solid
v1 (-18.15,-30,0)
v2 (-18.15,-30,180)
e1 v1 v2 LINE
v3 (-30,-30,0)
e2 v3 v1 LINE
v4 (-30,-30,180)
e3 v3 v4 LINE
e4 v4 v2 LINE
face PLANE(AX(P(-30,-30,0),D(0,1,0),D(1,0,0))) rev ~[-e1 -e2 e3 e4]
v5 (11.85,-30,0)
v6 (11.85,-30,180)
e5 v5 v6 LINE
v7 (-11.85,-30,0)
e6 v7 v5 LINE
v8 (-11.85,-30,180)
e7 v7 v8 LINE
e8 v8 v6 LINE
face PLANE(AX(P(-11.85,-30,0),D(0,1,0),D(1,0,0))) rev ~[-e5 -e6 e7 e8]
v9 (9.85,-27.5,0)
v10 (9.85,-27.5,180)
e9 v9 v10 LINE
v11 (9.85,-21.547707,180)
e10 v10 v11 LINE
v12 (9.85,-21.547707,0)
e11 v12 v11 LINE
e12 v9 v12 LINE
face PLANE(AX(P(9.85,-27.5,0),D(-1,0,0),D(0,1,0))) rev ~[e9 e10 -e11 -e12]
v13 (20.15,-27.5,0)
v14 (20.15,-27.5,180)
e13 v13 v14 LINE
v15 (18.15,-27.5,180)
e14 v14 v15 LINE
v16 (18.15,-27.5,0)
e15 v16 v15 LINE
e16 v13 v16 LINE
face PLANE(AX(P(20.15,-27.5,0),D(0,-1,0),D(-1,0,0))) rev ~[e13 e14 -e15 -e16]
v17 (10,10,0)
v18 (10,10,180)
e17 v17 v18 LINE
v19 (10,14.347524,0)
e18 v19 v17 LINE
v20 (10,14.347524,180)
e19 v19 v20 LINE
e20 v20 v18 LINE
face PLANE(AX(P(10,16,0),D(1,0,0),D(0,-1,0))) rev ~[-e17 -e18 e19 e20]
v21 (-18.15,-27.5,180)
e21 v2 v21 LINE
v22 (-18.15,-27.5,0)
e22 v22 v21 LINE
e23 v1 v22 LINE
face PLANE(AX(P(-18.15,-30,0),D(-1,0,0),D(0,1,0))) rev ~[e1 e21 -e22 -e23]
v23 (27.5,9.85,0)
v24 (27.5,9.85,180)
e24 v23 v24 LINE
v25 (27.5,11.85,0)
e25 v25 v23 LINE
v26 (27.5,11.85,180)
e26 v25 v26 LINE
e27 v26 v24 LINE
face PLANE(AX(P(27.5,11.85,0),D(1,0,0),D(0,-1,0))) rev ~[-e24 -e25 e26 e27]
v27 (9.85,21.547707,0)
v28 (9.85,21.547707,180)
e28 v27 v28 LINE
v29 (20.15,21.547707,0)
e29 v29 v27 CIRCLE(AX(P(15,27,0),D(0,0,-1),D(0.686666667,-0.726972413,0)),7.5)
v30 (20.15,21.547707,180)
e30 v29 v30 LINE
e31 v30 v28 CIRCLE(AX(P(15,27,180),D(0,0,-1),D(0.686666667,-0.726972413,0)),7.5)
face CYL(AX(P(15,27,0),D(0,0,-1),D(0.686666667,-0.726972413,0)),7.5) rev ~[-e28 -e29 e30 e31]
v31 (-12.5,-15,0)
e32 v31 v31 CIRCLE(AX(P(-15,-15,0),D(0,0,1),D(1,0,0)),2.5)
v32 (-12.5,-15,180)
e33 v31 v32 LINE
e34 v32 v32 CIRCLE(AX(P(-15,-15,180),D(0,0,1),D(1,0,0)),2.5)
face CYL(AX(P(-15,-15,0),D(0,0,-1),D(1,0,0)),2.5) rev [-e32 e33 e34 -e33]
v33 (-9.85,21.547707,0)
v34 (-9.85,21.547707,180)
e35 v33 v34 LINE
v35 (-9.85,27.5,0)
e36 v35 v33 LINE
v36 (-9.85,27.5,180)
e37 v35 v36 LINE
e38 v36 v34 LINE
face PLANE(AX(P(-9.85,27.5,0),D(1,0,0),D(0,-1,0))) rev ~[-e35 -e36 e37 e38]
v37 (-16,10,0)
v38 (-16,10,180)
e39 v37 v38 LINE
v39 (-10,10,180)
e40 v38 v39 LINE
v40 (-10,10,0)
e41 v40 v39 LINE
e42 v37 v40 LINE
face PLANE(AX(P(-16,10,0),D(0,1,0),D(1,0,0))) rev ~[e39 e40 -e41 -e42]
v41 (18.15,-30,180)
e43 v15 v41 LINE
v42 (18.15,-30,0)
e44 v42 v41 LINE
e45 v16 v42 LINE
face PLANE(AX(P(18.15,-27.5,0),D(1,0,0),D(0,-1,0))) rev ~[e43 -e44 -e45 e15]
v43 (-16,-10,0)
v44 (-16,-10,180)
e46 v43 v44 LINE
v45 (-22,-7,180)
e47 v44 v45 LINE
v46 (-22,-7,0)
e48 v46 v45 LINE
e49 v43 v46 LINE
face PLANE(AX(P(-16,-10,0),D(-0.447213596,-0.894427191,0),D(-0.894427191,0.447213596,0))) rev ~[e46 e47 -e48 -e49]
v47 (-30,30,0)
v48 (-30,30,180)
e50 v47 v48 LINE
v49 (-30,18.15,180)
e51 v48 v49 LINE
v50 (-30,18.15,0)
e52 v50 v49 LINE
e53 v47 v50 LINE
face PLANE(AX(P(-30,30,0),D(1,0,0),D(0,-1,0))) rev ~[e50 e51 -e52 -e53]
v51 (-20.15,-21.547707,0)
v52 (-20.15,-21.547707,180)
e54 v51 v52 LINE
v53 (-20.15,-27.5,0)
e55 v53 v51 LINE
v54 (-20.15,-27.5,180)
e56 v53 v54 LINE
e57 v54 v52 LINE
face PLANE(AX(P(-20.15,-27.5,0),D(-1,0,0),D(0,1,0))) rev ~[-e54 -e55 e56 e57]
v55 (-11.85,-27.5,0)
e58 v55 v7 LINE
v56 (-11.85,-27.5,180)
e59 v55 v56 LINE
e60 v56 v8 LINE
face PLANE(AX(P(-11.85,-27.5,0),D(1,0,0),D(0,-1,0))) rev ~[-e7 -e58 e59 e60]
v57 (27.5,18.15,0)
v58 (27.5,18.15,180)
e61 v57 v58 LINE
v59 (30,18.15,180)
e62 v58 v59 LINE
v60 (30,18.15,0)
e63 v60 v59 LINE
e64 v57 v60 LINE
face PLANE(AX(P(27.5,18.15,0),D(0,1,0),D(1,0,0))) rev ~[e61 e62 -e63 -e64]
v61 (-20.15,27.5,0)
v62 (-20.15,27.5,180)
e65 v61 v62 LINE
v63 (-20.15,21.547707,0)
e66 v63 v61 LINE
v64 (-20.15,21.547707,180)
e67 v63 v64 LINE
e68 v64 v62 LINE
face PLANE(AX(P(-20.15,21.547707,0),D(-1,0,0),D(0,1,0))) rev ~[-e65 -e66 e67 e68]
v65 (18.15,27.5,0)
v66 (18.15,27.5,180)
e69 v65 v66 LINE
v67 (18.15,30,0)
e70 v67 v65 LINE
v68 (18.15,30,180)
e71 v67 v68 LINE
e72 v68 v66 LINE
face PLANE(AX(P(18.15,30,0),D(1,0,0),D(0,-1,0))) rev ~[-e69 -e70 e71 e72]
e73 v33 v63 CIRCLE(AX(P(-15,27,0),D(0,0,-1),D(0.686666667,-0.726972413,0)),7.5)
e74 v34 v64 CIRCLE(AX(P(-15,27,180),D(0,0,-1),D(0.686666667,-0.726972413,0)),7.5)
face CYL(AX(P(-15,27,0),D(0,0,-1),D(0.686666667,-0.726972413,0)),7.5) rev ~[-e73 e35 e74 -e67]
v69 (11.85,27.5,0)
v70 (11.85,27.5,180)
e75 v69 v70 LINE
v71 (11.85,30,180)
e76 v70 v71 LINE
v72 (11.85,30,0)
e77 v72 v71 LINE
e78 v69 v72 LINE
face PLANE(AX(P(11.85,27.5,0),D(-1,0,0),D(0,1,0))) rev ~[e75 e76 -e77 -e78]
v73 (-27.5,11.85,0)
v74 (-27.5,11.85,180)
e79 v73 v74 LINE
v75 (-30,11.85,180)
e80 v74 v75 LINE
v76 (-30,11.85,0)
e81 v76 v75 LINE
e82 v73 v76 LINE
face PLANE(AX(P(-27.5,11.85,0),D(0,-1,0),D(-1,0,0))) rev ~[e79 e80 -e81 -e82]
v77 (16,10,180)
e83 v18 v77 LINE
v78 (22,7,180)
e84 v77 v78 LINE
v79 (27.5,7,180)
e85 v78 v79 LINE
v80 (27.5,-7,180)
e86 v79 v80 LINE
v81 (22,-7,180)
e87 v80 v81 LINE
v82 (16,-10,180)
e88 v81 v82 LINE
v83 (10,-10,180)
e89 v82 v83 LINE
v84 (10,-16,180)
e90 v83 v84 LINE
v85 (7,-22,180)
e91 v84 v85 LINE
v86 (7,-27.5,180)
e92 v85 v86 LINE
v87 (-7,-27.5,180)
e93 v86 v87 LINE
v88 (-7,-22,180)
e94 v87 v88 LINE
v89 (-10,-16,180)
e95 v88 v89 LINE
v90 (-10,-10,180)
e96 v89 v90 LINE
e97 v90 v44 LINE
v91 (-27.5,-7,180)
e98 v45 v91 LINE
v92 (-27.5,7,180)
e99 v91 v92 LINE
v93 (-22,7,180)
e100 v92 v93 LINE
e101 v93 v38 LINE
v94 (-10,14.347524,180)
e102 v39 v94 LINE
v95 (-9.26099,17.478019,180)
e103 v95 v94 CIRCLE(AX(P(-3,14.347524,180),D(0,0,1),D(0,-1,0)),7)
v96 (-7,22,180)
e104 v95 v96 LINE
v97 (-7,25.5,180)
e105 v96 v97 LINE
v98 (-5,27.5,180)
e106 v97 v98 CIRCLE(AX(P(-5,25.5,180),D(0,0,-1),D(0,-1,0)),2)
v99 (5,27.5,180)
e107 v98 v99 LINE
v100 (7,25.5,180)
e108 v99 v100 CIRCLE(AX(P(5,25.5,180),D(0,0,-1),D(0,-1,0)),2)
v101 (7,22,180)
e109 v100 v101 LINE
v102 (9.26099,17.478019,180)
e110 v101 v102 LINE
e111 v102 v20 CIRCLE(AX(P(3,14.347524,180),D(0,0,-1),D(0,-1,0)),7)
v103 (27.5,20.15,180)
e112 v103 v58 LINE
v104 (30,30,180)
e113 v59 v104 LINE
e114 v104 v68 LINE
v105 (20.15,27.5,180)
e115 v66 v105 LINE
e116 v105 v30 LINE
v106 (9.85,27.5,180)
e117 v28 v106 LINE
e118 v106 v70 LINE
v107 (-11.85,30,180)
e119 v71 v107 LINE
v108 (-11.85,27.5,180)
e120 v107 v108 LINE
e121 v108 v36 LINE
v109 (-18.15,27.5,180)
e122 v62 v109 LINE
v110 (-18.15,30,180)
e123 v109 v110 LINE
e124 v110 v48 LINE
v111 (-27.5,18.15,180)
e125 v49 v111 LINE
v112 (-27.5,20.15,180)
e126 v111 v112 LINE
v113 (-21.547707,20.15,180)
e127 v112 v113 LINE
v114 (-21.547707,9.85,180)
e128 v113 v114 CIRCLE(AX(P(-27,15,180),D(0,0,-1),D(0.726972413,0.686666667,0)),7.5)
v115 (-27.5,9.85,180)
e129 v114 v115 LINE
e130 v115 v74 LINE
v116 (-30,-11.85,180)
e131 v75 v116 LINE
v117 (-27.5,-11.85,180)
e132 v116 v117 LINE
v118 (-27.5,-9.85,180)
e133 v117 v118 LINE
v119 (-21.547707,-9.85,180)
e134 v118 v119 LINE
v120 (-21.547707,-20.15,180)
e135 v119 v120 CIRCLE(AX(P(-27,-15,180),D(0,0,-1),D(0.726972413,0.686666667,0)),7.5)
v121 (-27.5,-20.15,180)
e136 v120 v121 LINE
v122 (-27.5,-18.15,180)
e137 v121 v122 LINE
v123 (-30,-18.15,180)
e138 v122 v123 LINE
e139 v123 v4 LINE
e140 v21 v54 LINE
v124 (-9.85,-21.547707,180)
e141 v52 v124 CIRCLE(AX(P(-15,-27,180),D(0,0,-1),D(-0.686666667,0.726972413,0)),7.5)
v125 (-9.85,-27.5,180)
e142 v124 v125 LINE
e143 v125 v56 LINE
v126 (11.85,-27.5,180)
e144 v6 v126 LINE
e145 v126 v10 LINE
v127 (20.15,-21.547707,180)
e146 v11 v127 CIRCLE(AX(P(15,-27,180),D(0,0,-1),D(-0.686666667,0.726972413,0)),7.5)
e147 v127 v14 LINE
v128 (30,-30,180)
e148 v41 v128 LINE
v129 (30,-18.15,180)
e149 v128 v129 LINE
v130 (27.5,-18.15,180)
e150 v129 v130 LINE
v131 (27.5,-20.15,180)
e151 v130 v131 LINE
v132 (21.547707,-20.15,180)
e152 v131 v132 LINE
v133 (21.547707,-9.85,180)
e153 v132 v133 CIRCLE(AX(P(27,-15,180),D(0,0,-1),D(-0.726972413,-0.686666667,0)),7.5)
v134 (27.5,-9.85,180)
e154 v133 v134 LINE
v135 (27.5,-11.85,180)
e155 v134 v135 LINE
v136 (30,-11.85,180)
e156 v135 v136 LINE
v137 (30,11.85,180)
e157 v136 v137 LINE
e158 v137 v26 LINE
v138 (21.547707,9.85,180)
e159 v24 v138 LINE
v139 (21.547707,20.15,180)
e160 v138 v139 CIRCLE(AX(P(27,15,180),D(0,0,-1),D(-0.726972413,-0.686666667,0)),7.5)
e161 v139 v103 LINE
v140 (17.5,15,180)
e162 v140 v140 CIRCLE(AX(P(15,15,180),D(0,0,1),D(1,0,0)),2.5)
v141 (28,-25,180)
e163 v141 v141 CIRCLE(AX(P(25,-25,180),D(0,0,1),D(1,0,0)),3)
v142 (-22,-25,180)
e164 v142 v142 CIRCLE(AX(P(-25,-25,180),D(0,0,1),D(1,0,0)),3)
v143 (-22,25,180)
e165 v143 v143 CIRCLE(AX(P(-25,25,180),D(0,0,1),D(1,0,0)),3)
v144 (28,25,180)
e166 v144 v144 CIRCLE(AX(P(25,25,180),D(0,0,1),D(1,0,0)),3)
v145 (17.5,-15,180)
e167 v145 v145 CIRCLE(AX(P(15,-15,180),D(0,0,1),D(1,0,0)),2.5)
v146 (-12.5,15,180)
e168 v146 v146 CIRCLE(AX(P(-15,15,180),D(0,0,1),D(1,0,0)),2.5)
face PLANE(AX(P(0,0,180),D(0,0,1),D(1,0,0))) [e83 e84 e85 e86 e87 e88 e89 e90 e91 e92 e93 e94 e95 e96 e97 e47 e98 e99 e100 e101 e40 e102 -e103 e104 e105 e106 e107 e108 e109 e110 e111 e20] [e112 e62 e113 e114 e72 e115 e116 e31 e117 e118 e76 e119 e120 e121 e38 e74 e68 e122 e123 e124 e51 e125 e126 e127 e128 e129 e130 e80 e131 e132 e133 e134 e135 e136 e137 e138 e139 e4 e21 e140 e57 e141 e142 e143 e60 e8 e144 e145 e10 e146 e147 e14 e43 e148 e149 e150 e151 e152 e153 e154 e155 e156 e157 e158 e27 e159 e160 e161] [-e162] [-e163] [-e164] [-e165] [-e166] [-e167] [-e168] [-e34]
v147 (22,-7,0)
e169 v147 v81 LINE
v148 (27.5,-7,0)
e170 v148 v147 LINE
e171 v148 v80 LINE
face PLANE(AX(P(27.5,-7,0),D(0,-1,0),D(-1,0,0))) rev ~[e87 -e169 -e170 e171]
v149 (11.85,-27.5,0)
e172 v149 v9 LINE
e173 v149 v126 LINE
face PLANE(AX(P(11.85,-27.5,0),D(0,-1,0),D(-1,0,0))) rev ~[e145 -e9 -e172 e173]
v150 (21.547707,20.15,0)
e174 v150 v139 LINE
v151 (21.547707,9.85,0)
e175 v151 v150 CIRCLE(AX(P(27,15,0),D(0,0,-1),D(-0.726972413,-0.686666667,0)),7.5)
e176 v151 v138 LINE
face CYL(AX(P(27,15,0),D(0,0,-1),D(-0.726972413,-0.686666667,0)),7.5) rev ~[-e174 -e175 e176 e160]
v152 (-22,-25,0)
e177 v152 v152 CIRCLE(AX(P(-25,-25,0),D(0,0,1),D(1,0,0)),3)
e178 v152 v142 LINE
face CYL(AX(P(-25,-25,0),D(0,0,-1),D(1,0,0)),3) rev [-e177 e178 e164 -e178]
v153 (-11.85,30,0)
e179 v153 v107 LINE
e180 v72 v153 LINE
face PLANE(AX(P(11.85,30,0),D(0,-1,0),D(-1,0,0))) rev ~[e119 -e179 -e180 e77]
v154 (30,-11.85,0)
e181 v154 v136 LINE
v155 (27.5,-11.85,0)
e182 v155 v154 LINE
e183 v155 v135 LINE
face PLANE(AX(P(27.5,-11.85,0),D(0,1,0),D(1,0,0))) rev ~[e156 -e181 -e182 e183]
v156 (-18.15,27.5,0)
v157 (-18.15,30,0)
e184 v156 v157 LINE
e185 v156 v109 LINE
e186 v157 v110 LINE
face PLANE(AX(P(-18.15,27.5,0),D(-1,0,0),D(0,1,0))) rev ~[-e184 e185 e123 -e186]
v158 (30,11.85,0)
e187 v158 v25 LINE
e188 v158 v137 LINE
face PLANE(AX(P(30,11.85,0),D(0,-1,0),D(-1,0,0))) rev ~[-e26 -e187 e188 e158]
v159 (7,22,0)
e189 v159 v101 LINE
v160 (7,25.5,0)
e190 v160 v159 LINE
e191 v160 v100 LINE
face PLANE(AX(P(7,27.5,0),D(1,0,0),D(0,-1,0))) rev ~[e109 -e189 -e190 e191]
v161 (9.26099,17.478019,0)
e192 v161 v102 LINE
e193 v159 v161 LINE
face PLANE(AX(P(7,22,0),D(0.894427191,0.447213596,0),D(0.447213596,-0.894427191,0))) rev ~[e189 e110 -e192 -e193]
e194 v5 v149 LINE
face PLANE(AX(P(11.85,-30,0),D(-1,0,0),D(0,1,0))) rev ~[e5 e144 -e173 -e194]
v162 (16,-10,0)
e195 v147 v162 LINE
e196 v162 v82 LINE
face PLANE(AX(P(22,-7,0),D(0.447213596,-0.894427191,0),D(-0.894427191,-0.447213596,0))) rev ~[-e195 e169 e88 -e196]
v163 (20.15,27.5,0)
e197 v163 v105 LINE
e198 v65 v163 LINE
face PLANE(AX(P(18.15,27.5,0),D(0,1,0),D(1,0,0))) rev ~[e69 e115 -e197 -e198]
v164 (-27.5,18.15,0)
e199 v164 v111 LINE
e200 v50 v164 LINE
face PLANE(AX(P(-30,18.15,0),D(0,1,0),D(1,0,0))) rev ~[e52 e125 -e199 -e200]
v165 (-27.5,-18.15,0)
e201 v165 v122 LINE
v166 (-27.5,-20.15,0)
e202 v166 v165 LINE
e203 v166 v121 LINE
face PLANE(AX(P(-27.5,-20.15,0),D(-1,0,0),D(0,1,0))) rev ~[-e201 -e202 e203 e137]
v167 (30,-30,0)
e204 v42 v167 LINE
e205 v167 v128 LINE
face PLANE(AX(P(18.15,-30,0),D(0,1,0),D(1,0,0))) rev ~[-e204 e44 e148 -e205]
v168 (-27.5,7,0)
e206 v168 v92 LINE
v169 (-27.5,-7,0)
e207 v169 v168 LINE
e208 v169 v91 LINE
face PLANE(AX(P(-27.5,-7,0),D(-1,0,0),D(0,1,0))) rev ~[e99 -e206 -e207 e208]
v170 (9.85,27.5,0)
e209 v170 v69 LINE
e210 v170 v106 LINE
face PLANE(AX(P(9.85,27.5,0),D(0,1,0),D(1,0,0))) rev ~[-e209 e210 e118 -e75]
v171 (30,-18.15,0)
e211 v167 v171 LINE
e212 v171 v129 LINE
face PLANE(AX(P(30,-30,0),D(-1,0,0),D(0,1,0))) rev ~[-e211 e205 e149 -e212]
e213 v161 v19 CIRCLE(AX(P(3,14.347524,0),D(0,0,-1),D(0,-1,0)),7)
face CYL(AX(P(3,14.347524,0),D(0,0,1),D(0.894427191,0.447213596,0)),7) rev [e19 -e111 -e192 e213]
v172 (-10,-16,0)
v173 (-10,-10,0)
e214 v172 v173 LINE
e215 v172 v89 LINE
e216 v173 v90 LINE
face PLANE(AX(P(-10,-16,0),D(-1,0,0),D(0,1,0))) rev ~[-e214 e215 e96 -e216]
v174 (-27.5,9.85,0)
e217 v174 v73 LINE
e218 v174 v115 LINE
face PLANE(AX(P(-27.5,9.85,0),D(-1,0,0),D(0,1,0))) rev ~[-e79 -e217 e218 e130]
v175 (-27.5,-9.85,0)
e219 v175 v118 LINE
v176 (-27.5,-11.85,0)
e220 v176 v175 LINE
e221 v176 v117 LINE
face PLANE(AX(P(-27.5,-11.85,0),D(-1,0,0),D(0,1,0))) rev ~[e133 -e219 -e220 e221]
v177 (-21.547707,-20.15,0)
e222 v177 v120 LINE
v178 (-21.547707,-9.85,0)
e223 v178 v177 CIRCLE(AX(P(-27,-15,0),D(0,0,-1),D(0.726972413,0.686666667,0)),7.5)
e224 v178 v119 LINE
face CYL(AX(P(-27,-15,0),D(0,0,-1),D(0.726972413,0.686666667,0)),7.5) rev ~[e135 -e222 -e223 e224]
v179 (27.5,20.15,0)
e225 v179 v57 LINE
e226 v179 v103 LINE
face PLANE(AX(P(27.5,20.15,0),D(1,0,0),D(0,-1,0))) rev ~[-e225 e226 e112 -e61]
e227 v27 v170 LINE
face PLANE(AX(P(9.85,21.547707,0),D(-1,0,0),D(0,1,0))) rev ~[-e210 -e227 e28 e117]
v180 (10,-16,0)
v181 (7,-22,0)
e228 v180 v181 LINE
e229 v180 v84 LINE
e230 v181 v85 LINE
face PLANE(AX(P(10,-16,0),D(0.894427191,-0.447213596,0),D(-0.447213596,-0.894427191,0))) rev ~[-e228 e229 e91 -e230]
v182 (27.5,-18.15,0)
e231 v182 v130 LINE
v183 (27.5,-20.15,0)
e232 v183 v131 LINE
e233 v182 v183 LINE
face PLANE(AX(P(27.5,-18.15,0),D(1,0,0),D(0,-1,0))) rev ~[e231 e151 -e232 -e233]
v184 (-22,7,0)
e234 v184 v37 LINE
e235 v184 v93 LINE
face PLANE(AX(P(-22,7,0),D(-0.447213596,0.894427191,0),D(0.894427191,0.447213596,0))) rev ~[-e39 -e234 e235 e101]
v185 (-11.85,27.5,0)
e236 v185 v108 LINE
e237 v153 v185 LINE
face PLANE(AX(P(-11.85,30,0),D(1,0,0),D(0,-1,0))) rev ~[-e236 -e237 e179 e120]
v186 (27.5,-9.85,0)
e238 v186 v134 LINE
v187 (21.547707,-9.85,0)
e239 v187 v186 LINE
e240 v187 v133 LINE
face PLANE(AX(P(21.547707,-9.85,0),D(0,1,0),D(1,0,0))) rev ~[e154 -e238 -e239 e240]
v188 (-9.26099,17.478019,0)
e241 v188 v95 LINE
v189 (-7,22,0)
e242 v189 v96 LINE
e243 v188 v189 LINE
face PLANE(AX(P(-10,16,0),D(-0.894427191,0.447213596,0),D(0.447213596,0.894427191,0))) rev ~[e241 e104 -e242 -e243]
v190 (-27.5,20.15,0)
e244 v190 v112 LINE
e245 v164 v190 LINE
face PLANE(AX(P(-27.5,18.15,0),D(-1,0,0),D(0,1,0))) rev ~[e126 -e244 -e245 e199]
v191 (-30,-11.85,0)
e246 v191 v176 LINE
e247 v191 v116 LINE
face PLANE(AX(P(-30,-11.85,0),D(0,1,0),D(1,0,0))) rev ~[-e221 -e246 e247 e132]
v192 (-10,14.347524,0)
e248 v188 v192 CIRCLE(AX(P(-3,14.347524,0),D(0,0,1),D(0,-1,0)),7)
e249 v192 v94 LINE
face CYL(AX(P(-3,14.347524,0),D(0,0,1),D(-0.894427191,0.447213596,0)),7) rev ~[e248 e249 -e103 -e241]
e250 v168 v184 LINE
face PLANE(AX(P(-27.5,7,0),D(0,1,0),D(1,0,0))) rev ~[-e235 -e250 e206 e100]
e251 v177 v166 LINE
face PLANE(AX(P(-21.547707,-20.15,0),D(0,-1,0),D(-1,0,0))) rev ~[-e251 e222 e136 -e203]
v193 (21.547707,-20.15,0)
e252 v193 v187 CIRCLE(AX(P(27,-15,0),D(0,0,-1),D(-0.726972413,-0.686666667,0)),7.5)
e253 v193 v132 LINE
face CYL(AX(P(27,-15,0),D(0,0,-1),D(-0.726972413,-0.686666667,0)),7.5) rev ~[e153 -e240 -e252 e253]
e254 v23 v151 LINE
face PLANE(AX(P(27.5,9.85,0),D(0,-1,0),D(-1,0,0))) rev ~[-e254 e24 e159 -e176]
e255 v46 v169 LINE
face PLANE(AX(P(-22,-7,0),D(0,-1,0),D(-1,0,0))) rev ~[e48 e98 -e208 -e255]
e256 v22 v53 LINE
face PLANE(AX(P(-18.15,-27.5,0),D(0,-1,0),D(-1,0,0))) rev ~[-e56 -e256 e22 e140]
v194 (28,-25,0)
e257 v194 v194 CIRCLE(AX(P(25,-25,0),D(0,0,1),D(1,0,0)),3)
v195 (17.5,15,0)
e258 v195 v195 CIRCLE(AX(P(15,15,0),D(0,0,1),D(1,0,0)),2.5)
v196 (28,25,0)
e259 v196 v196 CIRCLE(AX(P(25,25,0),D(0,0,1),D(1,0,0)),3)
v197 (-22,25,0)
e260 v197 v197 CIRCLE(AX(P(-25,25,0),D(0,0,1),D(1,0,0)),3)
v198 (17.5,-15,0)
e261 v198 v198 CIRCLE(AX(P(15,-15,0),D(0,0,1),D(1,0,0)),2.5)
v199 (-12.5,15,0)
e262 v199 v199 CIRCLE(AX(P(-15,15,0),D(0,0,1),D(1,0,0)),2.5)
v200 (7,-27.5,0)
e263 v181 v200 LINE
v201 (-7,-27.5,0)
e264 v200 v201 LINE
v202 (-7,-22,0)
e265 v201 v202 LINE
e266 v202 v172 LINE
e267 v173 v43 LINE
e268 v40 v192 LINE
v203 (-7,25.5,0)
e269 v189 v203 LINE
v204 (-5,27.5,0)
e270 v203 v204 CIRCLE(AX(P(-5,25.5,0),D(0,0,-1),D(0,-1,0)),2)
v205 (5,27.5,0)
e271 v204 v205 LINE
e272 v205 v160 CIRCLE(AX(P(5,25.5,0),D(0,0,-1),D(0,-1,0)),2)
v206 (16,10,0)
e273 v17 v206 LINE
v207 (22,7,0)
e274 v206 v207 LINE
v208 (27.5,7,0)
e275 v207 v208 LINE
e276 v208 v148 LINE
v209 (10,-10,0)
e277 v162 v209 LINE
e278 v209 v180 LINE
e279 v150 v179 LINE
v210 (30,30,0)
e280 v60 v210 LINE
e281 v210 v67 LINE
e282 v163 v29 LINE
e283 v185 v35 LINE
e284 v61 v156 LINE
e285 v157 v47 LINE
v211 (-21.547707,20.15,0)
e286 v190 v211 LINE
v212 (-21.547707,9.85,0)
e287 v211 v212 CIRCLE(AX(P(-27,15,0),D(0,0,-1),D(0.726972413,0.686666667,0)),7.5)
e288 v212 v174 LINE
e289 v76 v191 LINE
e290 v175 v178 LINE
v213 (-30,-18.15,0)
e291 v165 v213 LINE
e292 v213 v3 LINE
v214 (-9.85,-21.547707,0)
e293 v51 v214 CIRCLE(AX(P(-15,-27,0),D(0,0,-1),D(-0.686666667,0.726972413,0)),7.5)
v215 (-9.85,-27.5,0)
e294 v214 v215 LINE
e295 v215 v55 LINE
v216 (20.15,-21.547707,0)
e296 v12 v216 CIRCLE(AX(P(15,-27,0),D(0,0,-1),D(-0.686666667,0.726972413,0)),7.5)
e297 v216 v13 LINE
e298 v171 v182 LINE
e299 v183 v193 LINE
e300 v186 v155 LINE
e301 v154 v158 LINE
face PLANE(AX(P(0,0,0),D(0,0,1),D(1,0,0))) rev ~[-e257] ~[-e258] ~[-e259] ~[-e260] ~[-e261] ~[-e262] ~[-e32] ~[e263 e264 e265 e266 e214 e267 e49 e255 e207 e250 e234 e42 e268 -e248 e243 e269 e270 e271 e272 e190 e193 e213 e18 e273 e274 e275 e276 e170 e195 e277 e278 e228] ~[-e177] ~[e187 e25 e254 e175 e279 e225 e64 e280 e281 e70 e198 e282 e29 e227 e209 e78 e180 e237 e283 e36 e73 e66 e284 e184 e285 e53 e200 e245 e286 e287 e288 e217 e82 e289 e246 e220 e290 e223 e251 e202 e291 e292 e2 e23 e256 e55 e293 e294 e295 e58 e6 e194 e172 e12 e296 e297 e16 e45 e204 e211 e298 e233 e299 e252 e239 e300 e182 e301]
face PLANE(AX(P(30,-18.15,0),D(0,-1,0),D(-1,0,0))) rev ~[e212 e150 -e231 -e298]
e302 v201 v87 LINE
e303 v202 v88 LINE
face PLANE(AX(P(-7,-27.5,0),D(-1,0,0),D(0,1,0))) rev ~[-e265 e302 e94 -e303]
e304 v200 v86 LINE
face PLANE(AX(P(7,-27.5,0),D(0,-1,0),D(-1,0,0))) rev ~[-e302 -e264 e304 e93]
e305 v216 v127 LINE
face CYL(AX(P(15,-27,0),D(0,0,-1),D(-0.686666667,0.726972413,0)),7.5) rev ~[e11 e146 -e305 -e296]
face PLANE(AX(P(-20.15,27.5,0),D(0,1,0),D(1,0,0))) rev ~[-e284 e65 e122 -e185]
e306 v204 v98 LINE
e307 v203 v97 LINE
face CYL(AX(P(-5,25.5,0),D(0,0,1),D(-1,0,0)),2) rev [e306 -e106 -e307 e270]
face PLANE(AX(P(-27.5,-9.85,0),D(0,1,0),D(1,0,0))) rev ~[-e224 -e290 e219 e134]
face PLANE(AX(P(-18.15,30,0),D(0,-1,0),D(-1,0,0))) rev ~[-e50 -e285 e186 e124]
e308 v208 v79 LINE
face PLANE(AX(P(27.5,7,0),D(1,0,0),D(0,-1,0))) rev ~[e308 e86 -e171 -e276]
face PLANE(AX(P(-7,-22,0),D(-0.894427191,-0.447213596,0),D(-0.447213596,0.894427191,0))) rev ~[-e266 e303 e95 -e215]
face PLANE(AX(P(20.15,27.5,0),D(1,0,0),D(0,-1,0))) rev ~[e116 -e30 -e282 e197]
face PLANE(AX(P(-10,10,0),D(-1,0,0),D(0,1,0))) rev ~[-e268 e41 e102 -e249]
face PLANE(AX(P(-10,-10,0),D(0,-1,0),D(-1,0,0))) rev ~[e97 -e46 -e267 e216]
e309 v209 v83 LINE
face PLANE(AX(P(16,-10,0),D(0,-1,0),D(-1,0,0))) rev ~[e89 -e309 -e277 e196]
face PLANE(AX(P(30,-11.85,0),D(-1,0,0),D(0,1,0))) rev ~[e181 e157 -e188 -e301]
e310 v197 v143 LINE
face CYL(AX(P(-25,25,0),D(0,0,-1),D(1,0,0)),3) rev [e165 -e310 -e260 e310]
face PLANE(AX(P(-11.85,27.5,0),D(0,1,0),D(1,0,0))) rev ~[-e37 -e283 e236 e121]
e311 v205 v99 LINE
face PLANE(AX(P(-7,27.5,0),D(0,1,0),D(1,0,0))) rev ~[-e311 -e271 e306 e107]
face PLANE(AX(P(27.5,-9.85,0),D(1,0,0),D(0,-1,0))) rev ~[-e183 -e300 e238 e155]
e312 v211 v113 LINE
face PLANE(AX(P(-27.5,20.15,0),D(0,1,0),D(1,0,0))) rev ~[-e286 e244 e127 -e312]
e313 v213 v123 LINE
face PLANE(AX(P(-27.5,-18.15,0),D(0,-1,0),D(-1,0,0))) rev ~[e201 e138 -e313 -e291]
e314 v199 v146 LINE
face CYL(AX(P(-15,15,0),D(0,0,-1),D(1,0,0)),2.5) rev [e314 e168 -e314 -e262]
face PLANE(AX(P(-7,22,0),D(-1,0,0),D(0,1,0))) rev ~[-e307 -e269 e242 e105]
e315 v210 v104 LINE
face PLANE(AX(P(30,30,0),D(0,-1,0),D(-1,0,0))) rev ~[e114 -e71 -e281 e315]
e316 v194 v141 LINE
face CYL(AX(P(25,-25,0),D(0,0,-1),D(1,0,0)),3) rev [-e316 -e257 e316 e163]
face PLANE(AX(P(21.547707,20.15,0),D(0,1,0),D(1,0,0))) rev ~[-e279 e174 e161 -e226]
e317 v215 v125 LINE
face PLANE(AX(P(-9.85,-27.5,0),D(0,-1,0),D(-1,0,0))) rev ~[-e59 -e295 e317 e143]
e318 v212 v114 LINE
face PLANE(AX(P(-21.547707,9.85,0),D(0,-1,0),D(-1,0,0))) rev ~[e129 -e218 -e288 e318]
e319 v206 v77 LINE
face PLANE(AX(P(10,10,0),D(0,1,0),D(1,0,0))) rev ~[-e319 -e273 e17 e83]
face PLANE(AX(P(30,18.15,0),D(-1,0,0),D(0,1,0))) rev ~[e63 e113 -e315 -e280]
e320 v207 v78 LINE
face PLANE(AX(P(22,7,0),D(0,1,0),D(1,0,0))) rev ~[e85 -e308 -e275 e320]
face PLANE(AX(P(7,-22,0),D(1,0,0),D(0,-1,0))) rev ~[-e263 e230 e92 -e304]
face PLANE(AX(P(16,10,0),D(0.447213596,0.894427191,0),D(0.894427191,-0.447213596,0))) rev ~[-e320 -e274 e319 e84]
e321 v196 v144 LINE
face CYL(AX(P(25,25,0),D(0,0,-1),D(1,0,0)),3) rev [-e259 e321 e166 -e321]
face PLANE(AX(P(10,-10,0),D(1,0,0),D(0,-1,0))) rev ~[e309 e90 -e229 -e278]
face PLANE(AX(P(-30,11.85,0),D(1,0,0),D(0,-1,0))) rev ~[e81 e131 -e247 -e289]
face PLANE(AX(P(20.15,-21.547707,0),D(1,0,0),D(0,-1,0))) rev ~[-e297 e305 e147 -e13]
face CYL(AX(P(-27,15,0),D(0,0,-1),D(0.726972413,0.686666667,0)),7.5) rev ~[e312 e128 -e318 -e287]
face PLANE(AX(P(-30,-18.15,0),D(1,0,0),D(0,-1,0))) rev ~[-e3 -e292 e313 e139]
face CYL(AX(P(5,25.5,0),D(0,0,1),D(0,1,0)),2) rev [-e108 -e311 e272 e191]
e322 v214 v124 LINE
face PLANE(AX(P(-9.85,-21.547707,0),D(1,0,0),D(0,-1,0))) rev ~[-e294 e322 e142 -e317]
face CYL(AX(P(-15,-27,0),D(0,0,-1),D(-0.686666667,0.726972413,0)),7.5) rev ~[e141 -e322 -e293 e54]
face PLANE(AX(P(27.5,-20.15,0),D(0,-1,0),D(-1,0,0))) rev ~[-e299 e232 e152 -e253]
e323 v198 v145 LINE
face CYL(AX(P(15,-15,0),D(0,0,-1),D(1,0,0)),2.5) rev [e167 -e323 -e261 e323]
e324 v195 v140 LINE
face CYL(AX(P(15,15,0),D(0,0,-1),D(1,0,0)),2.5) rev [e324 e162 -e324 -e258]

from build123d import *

# Parameters (mm, degrees)
F0_R     = 3
F0_R_2   = 2.5
F1_DEPTH = 180
F2_R     = 2
F3_R     = 7


# Not quite as in the source:
# - a feature names something its author has since deleted; it is built from what else it names


with BuildPart() as f1:
    # F0 (on Top) → F1 (new body)
    with BuildSketch(Plane.XY):
        with BuildLine():
            Line((18.15, -30), (30, -30))
            Line((30, -30), (30, -18.15))
            Line((30, -18.15), (27.5, -18.15))
            Line((27.5, -18.15), (27.5, -20.15))
            Line((27.5, -20.15), (21.5477069044, -20.15))
            ThreePointArc((21.5477069044, -20.15), (19.5, -15), (21.5477069044, -9.85))
            Line((21.5477069044, -9.85), (27.5, -9.85))
            Line((27.5, -9.85), (27.5, -11.85))
            Line((27.5, -11.85), (30, -11.85))
            Line((30, -11.85), (30, 11.85))
            Line((30, 11.85), (27.5, 11.85))
            Line((27.5, 11.85), (27.5, 9.85))
            Line((27.5, 9.85), (21.5477069044, 9.85))
            ThreePointArc((21.5477069044, 9.85), (19.5, 15), (21.5477069044, 20.15))
            Line((21.5477069044, 20.15), (27.5, 20.15))
            Line((27.5, 20.15), (27.5, 18.15))
            Line((27.5, 18.15), (30, 18.15))
            Line((30, 18.15), (30, 30))
            Line((30, 30), (18.15, 30))
            Line((18.15, 30), (18.15, 27.5))
            Line((18.15, 27.5), (20.15, 27.5))
            Line((20.15, 27.5), (20.15, 21.5477069044))
            ThreePointArc((20.15, 21.5477069044), (15, 19.5), (9.85, 21.5477069044))
            Line((9.85, 21.5477069044), (9.85, 27.5))
            Line((9.85, 27.5), (11.85, 27.5))
            Line((11.85, 27.5), (11.85, 30))
            Line((11.85, 30), (-11.85, 30))
            Line((-11.85, 30), (-11.85, 27.5))
            Line((-11.85, 27.5), (-9.85, 27.5))
            Line((-9.85, 27.5), (-9.85, 21.5477069044))
            ThreePointArc((-9.85, 21.5477069044), (-15, 19.5), (-20.15, 21.5477069044))
            Line((-20.15, 21.5477069044), (-20.15, 27.5))
            Line((-20.15, 27.5), (-18.15, 27.5))
            Line((-18.15, 27.5), (-18.15, 30))
            Line((-18.15, 30), (-30, 30))
            Line((-30, 30), (-30, 18.15))
            Line((-30, 18.15), (-27.5, 18.15))
            Line((-27.5, 18.15), (-27.5, 20.15))
            Line((-27.5, 20.15), (-21.5477069044, 20.15))
            ThreePointArc((-21.5477069044, 20.15), (-19.5, 15), (-21.5477069044, 9.85))
            Line((-21.5477069044, 9.85), (-27.5, 9.85))
            Line((-27.5, 9.85), (-27.5, 11.85))
            Line((-27.5, 11.85), (-30, 11.85))
            Line((-30, 11.85), (-30, -11.85))
            Line((-30, -11.85), (-27.5, -11.85))
            Line((-27.5, -11.85), (-27.5, -9.85))
            Line((-27.5, -9.85), (-21.5477069044, -9.85))
            ThreePointArc((-21.5477069044, -9.85), (-19.5, -15), (-21.5477069044, -20.15))
            Line((-21.5477069044, -20.15), (-27.5, -20.15))
            Line((-27.5, -20.15), (-27.5, -18.15))
            Line((-27.5, -18.15), (-30, -18.15))
            Line((-30, -18.15), (-30, -30))
            Line((-30, -30), (-18.15, -30))
            Line((-18.15, -30), (-18.15, -27.5))
            Line((-18.15, -27.5), (-20.15, -27.5))
            Line((-20.15, -27.5), (-20.15, -21.5477069044))
            ThreePointArc((-20.15, -21.5477069044), (-15, -19.5), (-9.85, -21.5477069044))
            Line((-9.85, -21.5477069044), (-9.85, -27.5))
            Line((-9.85, -27.5), (-11.85, -27.5))
            Line((-11.85, -27.5), (-11.85, -30))
            Line((-11.85, -30), (11.85, -30))
            Line((11.85, -30), (11.85, -27.5))
            Line((11.85, -27.5), (9.85, -27.5))
            Line((9.85, -27.5), (9.85, -21.5477069044))
            ThreePointArc((9.85, -21.5477069044), (15, -19.5), (20.15, -21.5477069044))
            Line((20.15, -21.5477069044), (20.15, -27.5))
            Line((20.15, -27.5), (18.15, -27.5))
            Line((18.15, -27.5), (18.15, -30))
        make_face()
        with Locations((-25, -25)):
            Circle(F0_R, mode=Mode.SUBTRACT)
        with Locations((-15, -15)):
            Circle(F0_R_2, mode=Mode.SUBTRACT)
        with Locations((25, -25)):
            Circle(F0_R, mode=Mode.SUBTRACT)
        with Locations((15, -15)):
            Circle(F0_R_2, mode=Mode.SUBTRACT)
        with Locations((-25, 25)):
            Circle(F0_R, mode=Mode.SUBTRACT)
        with Locations((-15, 15)):
            Circle(F0_R_2, mode=Mode.SUBTRACT)
        Polygon((-7, 22), (-7, 27.5), (0, 27.5), (7, 27.5), (7, 22), (10, 16), (10, 10), (16, 10), (22, 7), (27.5, 7), (27.5, 0), (27.5, -7), (22, -7), (16, -10), (10, -10), (10, -16), (7, -22), (7, -27.5), (0, -27.5), (-7, -27.5), (-7, -22), (-10, -16), (-10, -10), (-16, -10), (-22, -7), (-27.5, -7), (-27.5, 0), (-27.5, 7), (-22, 7), (-16, 10), (-10, 10), (-10, 16), align=None, mode=Mode.SUBTRACT)
        with Locations((15, 15)):
            Circle(F0_R_2, mode=Mode.SUBTRACT)
        with Locations((25, 25)):
            Circle(F0_R, mode=Mode.SUBTRACT)
    extrude(amount=F1_DEPTH)

    # F2
    f2_edges = [f1.edges().sort_by_distance(p)[0] for p in [
        (-7, 27.5, 90),
        (7, 27.5, 90),
    ]]
    fillet(f2_edges, radius=F2_R)

    # F3
    f3_edges = [f1.edges().sort_by_distance(p)[0] for p in [
        (-10, 16, 90),
        (10, 16, 90),
    ]]
    fillet(f3_edges, radius=F3_R)


solid = f1.part
